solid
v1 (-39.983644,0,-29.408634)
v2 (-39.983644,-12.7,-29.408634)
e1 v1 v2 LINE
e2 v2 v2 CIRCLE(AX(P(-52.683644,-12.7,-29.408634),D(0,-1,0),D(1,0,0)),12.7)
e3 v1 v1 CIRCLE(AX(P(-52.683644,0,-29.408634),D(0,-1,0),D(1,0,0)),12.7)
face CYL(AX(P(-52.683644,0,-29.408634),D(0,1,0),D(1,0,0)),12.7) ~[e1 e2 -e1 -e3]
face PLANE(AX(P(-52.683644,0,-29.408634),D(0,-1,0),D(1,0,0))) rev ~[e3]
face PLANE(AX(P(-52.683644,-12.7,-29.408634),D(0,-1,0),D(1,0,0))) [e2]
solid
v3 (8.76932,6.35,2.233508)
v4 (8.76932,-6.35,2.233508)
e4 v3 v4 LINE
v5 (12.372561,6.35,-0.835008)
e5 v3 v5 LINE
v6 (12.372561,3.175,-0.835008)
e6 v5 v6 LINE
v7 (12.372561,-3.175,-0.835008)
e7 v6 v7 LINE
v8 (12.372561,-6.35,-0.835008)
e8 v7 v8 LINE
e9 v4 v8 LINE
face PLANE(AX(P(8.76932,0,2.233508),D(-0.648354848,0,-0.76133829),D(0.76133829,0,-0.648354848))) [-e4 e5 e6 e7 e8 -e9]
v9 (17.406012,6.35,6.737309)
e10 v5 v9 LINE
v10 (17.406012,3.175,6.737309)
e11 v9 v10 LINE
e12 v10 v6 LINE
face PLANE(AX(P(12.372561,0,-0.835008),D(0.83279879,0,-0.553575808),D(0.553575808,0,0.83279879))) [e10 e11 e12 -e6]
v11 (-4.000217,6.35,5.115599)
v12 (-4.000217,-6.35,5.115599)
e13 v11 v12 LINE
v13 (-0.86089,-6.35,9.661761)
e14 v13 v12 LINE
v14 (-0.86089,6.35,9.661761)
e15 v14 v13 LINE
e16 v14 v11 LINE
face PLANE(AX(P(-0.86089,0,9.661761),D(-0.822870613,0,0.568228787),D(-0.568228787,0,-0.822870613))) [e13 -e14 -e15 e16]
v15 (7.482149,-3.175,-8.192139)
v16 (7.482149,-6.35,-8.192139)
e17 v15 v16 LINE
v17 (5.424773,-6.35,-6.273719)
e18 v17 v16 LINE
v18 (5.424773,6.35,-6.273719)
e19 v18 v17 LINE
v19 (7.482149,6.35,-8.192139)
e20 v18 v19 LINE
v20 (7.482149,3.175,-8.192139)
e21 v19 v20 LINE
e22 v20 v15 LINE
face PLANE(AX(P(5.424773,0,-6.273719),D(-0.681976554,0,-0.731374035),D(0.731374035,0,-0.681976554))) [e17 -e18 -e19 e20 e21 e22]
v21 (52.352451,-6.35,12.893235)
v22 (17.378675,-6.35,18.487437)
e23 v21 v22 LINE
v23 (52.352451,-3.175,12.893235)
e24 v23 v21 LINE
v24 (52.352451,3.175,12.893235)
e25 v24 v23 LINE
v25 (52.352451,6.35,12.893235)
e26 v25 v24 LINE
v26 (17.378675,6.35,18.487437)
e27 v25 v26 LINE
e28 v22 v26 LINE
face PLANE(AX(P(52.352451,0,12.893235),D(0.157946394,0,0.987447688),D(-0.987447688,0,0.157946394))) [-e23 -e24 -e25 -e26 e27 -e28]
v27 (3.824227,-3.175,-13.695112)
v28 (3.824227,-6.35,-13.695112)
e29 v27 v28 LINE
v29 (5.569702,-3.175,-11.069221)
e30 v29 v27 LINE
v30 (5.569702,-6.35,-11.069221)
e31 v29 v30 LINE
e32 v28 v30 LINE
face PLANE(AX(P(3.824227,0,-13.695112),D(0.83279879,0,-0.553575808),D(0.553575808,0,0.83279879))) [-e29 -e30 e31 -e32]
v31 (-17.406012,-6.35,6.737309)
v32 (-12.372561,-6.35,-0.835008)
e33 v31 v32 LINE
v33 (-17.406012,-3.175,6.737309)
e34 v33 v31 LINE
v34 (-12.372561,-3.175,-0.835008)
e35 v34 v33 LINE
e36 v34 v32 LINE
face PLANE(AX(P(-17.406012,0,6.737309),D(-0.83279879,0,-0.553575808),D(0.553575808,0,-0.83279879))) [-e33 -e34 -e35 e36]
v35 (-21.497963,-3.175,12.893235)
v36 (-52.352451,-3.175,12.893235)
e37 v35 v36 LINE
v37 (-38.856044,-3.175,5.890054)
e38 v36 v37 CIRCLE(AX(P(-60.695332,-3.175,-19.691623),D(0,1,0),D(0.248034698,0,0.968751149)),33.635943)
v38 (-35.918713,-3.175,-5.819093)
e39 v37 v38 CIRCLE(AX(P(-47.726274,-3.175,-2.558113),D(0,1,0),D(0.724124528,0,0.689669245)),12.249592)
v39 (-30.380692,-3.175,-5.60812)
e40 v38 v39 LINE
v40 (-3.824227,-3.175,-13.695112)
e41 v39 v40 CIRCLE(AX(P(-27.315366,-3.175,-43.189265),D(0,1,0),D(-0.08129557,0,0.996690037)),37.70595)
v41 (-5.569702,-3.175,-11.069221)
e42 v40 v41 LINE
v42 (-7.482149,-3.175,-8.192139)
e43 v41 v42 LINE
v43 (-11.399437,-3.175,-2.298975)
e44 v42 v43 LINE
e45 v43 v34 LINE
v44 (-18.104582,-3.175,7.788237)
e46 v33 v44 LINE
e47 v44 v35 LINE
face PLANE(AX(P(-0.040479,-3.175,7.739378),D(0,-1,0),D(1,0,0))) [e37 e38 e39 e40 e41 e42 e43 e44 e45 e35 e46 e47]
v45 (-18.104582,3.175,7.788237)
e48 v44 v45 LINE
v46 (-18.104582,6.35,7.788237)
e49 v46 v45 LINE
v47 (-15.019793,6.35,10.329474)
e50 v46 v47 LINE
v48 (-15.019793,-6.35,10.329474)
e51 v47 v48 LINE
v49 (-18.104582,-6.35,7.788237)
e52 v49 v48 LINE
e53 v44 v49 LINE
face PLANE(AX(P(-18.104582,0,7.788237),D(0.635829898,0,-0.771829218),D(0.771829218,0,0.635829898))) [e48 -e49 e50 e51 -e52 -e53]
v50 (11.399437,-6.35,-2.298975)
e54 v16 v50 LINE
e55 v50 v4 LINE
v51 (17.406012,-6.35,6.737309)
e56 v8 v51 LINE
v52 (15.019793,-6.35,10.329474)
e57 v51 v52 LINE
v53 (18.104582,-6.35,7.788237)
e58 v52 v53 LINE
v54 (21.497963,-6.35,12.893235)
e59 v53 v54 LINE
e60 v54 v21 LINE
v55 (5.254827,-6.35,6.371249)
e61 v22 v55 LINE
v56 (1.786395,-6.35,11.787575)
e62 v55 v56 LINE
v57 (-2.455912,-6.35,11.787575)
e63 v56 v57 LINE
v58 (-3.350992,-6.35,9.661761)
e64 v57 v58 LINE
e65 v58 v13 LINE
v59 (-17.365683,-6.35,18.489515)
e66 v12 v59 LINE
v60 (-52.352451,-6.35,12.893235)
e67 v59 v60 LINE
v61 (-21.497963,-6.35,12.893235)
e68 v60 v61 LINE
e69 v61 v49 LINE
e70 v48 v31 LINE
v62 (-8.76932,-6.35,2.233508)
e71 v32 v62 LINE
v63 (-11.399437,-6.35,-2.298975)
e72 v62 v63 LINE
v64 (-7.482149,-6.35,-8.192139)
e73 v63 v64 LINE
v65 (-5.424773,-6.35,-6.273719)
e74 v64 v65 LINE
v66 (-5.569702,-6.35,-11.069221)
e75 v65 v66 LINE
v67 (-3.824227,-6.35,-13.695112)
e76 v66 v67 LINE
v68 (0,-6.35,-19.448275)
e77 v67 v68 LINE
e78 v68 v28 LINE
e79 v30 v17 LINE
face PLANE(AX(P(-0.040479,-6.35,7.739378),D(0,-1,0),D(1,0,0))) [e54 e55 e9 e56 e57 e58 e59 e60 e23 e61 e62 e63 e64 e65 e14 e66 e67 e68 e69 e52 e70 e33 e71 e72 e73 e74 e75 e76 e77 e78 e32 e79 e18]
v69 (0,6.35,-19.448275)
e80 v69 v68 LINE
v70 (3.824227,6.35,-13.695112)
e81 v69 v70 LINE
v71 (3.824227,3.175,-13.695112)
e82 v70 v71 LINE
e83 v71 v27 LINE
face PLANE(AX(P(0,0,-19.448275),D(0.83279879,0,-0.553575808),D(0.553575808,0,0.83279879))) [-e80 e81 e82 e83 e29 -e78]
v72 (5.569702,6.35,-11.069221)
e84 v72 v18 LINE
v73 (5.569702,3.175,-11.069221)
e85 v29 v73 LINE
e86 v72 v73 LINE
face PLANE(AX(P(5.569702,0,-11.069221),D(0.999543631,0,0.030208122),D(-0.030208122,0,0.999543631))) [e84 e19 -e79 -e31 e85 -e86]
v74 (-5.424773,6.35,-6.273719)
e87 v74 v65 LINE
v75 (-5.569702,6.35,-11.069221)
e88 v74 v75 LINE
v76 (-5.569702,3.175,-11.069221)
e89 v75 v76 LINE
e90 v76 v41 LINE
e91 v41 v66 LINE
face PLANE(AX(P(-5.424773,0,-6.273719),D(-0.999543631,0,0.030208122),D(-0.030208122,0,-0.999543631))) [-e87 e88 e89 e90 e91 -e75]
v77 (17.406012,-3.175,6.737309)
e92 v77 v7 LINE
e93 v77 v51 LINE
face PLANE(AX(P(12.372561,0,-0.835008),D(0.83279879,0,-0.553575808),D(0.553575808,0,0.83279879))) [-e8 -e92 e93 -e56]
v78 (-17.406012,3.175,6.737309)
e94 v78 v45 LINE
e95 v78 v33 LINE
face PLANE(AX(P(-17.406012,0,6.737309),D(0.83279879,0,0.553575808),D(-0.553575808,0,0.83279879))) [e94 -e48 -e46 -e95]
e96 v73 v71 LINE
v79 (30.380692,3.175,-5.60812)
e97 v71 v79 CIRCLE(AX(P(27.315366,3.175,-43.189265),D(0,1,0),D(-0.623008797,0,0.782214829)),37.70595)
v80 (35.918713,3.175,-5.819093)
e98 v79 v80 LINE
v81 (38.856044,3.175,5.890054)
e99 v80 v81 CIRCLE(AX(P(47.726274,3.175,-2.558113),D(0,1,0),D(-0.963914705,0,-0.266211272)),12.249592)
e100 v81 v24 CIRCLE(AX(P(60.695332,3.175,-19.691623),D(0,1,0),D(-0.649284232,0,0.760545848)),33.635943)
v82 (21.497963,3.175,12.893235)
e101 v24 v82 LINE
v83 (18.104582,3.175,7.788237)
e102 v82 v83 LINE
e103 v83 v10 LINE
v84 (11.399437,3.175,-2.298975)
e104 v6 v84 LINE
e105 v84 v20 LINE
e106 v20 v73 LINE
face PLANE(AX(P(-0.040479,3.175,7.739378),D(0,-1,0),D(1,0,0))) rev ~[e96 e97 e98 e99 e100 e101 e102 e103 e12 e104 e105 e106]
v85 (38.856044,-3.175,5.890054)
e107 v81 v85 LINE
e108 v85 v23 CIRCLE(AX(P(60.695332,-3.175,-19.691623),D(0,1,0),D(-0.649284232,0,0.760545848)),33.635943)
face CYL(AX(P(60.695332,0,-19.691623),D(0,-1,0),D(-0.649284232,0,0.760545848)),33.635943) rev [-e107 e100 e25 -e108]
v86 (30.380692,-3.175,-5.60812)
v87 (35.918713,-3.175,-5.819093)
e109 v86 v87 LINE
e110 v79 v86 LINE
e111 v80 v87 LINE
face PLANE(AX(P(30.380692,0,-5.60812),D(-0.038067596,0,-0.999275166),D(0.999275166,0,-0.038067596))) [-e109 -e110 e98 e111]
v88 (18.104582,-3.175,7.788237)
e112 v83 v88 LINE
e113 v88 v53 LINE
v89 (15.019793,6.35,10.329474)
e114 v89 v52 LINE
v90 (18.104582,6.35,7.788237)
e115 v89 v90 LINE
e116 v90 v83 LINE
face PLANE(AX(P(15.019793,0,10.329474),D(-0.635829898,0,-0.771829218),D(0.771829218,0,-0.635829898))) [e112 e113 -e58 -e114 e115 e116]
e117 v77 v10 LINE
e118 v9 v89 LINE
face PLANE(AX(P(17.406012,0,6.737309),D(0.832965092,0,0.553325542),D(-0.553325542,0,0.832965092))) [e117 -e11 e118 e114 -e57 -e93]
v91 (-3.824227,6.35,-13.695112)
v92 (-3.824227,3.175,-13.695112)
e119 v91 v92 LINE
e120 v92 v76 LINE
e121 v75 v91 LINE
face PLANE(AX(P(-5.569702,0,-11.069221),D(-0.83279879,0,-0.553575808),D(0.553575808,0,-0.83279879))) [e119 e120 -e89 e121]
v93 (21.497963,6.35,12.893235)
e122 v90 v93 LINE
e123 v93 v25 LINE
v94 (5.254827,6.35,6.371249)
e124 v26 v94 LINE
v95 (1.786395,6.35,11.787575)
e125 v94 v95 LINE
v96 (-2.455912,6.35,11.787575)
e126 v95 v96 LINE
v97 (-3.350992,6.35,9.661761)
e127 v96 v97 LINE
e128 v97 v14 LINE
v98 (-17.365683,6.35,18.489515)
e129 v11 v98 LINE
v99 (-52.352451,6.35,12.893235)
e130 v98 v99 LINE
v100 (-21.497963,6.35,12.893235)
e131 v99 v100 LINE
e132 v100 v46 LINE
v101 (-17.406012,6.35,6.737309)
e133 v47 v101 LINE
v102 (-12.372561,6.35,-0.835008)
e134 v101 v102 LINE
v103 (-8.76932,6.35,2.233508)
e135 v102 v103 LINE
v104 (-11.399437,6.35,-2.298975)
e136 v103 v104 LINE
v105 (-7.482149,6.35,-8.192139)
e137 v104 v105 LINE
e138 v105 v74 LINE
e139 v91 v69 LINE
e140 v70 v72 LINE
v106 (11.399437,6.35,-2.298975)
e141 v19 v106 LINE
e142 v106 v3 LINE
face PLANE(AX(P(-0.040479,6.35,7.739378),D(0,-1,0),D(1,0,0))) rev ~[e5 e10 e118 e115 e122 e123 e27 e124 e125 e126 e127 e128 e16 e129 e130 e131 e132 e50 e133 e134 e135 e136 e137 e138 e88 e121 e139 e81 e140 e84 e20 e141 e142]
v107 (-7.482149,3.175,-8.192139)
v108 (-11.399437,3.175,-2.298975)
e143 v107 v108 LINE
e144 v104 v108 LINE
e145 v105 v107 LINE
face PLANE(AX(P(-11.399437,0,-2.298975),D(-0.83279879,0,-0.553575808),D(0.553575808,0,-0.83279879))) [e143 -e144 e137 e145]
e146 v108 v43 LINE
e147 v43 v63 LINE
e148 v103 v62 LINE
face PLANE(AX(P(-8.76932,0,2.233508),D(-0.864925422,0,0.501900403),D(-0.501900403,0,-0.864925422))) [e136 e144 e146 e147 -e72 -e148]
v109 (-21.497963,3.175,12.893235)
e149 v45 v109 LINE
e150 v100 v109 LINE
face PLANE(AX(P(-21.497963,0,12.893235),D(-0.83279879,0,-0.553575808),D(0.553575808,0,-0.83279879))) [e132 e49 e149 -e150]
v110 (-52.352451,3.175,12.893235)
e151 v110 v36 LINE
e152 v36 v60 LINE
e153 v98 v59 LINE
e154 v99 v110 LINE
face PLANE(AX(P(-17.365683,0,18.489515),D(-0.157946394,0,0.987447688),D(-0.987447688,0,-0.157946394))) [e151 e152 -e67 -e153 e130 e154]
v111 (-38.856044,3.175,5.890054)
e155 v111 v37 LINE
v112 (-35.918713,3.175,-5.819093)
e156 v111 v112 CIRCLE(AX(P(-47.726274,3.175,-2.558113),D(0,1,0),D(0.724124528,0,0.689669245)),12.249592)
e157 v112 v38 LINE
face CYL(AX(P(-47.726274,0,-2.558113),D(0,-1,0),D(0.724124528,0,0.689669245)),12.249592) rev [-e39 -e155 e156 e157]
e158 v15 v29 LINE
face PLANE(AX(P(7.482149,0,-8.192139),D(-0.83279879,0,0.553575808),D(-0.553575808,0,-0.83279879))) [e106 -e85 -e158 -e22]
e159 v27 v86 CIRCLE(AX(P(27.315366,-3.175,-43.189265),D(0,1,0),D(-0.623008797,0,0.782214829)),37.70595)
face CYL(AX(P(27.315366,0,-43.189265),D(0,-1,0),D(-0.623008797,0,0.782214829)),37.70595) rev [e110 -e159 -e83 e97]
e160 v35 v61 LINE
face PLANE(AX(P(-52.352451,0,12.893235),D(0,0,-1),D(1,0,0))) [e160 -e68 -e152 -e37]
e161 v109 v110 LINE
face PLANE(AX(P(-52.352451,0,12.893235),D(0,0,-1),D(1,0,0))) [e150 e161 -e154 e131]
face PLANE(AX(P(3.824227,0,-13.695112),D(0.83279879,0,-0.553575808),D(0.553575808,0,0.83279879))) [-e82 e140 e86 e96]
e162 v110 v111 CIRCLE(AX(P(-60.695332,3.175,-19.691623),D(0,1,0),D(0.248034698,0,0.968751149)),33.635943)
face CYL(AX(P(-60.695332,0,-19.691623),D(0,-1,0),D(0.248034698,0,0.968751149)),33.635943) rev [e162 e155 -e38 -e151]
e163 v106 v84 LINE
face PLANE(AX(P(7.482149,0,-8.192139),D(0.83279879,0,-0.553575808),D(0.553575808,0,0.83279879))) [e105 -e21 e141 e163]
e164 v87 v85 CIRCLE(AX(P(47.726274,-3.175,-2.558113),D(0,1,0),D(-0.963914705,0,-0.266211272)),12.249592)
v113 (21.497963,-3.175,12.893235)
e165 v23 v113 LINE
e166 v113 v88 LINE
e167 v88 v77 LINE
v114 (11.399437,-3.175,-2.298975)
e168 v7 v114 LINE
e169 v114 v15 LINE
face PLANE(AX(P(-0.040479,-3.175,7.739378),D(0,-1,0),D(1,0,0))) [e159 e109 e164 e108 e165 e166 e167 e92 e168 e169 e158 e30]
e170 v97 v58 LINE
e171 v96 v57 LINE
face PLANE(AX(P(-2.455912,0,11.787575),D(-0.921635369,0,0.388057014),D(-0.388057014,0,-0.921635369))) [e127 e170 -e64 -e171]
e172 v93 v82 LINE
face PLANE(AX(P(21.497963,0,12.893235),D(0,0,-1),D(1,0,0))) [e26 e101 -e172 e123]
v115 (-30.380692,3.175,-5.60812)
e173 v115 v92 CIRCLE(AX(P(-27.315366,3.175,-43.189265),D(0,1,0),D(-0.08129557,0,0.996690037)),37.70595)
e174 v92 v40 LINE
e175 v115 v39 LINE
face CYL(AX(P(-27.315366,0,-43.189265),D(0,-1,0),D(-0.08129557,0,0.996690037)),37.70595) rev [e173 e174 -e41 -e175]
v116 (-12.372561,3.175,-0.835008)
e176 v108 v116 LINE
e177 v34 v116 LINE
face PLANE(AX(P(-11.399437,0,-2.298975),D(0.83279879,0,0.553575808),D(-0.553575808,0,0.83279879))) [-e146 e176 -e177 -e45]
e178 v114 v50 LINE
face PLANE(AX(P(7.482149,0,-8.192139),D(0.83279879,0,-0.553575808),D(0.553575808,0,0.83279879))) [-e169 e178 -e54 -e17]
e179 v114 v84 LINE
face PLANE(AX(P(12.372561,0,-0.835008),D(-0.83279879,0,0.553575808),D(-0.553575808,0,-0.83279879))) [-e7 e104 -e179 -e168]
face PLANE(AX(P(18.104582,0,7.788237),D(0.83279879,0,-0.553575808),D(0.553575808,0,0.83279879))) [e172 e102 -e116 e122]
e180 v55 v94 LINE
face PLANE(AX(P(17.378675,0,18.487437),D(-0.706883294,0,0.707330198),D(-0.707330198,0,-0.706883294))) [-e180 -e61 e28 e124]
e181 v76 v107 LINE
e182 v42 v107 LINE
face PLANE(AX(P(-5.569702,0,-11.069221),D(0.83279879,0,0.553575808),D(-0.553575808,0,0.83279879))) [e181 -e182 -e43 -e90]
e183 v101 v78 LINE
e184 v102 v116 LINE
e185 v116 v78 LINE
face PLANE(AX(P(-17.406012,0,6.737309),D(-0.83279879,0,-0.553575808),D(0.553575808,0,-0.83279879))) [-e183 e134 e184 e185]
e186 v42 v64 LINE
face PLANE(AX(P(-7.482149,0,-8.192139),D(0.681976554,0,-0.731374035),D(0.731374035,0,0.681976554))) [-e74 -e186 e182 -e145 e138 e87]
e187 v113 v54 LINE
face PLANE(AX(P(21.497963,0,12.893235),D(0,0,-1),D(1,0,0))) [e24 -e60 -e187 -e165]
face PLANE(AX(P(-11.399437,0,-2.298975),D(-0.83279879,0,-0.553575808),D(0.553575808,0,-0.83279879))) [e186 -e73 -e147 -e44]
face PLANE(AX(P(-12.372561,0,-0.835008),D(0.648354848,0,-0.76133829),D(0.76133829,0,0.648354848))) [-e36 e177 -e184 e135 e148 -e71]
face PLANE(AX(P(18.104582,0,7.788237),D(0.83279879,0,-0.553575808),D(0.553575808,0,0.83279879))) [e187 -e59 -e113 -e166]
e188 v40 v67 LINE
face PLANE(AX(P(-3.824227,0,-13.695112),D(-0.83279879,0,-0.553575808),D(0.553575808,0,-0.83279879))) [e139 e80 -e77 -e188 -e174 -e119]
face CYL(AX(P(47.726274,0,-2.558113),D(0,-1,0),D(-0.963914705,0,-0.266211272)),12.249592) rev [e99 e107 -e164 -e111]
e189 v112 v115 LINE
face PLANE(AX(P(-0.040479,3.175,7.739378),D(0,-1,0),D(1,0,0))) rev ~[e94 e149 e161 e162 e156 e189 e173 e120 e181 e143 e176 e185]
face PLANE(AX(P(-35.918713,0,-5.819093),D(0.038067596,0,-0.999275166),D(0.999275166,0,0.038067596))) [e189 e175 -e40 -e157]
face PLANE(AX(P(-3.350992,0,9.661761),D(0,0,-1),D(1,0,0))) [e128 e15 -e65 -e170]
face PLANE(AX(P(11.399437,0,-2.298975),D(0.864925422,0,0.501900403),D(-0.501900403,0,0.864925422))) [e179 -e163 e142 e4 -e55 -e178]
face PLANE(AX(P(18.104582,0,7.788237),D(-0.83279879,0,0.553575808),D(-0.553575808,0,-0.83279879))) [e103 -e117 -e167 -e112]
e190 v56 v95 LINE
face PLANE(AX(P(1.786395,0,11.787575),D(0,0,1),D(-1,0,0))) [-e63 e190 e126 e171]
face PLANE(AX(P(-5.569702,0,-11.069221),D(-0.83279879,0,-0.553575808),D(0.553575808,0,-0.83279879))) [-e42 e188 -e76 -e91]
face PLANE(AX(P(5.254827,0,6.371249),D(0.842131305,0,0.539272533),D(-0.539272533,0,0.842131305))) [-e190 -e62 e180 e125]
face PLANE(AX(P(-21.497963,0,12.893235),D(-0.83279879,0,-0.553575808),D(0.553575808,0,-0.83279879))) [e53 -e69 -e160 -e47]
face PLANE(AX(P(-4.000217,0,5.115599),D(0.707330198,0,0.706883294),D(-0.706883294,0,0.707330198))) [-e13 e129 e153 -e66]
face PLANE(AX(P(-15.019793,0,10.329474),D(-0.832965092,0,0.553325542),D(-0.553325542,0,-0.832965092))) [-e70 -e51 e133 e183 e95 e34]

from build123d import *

# Parameters (mm, degrees)
F1_DEPTH = 6.35
F2_DEPTH = 3.175
F3_R     = 12.7
F4_DEPTH = 12.7


# Not quite as in the source:
# - a feature names something its author has since deleted; it is built from what else it names


with BuildPart() as f1:
    # F0 (on Front) → F1 (new body, symmetric)
    with BuildSketch(Plane.XZ):
        Polygon((1.7863946268, 11.7875747383), (0, 11.7875747383), (-2.4559120648, 11.7875747383), (-3.3509915229, 9.6617611125), (-0.8608896751, 9.6617611125), (-4.0002167225, 5.1155993715), (-17.3656828701, 18.4895154089), (-52.352450788, 12.8932353109), (-21.4979629964, 12.8932353109), (-18.104581877, 7.788236776), (-15.0197930634, 10.3294737637), (-17.406011636, 6.7373085332), (-12.3725614796, -0.8350079177), (-8.7693203241, 2.2335082758), (-11.3994373246, -2.2989747433), (-7.4821490115, -8.1921386397), (-5.4247728549, -6.2737190165), (-5.5697021181, -11.06922148), (-3.8242271729, -13.6951119192), (0, -19.4482747465), (3.8242271729, -13.6951119192), (5.5697021181, -11.06922148), (5.4247728549, -6.2737190165), (7.4821490115, -8.1921386397), (11.3994373246, -2.2989747433), (8.7693203241, 2.2335082758), (12.3725614796, -0.8350079177), (17.406011636, 6.7373085332), (15.0197930634, 10.3294737637), (18.104581877, 7.788236776), (21.4979629964, 12.8932353109), (52.352450788, 12.8932353109), (17.3786748844, 18.4874372818), (5.2548269741, 6.3712494448), align=None)
    extrude(amount=F1_DEPTH, both=True)

    # F0 (on Front) → F2 (join, symmetric)
    with BuildSketch(Plane.XZ):
        Polygon((1.7863946268, 11.7875747383), (0, 11.7875747383), (-2.4559120648, 11.7875747383), (-3.3509915229, 9.6617611125), (-0.8608896751, 9.6617611125), (-4.0002167225, 5.1155993715), (-17.3656828701, 18.4895154089), (-52.352450788, 12.8932353109), (-21.4979629964, 12.8932353109), (-18.104581877, 7.788236776), (-15.0197930634, 10.3294737637), (-17.406011636, 6.7373085332), (-12.3725614796, -0.8350079177), (-8.7693203241, 2.2335082758), (-11.3994373246, -2.2989747433), (-7.4821490115, -8.1921386397), (-5.4247728549, -6.2737190165), (-5.5697021181, -11.06922148), (-3.8242271729, -13.6951119192), (0, -19.4482747465), (3.8242271729, -13.6951119192), (5.5697021181, -11.06922148), (5.4247728549, -6.2737190165), (7.4821490115, -8.1921386397), (11.3994373246, -2.2989747433), (8.7693203241, 2.2335082758), (12.3725614796, -0.8350079177), (17.406011636, 6.7373085332), (15.0197930634, 10.3294737637), (18.104581877, 7.788236776), (21.4979629964, 12.8932353109), (52.352450788, 12.8932353109), (17.3786748844, 18.4874372818), (5.2548269741, 6.3712494448), align=None)
        with BuildLine():
            ThreePointArc((38.8560444117, 5.8900536969), (45.2033351378, 10.1642758317), (52.352450788, 12.8932353109))
            Line((52.352450788, 12.8932353109), (21.4979629964, 12.8932353109))
            Line((21.4979629964, 12.8932353109), (18.104581877, 7.788236776))
            Line((18.104581877, 7.788236776), (17.406011636, 6.7373085332))
            Line((17.406011636, 6.7373085332), (12.3725614796, -0.8350079177))
            Line((12.3725614796, -0.8350079177), (11.3994373246, -2.2989747433))
            Line((11.3994373246, -2.2989747433), (7.4821490115, -8.1921386397))
            Line((7.4821490115, -8.1921386397), (5.5697021181, -11.06922148))
            Line((5.5697021181, -11.06922148), (3.8242271729, -13.6951119192))
            ThreePointArc((3.8242271729, -13.6951119192), (16.3311358391, -7.118704323), (30.380692333, -5.6081204675))
            Line((30.380692333, -5.6081204675), (35.918712616, -5.8190925047))
            ThreePointArc((35.918712616, -5.8190925047), (35.8448269076, 0.4224418486), (38.8560444117, 5.8900536969))
        make_face()
        with BuildLine():
            Line((-21.4979629964, 12.8932353109), (-52.352450788, 12.8932353109))
            ThreePointArc((-52.352450788, 12.8932353109), (-45.2033351378, 10.1642758317), (-38.8560444117, 5.8900536969))
            ThreePointArc((-38.8560444117, 5.8900536969), (-35.8448269076, 0.4224418486), (-35.918712616, -5.8190925047))
            Line((-35.918712616, -5.8190925047), (-30.380692333, -5.6081204675))
            ThreePointArc((-30.380692333, -5.6081204675), (-16.3311358391, -7.118704323), (-3.8242271729, -13.6951119192))
            Line((-3.8242271729, -13.6951119192), (-5.5697021181, -11.06922148))
            Line((-5.5697021181, -11.06922148), (-7.4821490115, -8.1921386397))
            Line((-7.4821490115, -8.1921386397), (-11.3994373246, -2.2989747433))
            Line((-11.3994373246, -2.2989747433), (-12.3725614796, -0.8350079177))
            Line((-12.3725614796, -0.8350079177), (-17.406011636, 6.7373085332))
            Line((-17.406011636, 6.7373085332), (-18.104581877, 7.788236776))
            Line((-18.104581877, 7.788236776), (-21.4979629964, 12.8932353109))
        make_face()
    extrude(amount=F2_DEPTH, both=True)


with BuildPart() as f4:
    # F3 (on Front) → F4 (new body)
    with BuildSketch(Plane.XZ):
        with Locations((-52.6836439967, -29.408633709)):
            Circle(F3_R)
    extrude(amount=F4_DEPTH)


solid = Compound([f1.part, f4.part])
